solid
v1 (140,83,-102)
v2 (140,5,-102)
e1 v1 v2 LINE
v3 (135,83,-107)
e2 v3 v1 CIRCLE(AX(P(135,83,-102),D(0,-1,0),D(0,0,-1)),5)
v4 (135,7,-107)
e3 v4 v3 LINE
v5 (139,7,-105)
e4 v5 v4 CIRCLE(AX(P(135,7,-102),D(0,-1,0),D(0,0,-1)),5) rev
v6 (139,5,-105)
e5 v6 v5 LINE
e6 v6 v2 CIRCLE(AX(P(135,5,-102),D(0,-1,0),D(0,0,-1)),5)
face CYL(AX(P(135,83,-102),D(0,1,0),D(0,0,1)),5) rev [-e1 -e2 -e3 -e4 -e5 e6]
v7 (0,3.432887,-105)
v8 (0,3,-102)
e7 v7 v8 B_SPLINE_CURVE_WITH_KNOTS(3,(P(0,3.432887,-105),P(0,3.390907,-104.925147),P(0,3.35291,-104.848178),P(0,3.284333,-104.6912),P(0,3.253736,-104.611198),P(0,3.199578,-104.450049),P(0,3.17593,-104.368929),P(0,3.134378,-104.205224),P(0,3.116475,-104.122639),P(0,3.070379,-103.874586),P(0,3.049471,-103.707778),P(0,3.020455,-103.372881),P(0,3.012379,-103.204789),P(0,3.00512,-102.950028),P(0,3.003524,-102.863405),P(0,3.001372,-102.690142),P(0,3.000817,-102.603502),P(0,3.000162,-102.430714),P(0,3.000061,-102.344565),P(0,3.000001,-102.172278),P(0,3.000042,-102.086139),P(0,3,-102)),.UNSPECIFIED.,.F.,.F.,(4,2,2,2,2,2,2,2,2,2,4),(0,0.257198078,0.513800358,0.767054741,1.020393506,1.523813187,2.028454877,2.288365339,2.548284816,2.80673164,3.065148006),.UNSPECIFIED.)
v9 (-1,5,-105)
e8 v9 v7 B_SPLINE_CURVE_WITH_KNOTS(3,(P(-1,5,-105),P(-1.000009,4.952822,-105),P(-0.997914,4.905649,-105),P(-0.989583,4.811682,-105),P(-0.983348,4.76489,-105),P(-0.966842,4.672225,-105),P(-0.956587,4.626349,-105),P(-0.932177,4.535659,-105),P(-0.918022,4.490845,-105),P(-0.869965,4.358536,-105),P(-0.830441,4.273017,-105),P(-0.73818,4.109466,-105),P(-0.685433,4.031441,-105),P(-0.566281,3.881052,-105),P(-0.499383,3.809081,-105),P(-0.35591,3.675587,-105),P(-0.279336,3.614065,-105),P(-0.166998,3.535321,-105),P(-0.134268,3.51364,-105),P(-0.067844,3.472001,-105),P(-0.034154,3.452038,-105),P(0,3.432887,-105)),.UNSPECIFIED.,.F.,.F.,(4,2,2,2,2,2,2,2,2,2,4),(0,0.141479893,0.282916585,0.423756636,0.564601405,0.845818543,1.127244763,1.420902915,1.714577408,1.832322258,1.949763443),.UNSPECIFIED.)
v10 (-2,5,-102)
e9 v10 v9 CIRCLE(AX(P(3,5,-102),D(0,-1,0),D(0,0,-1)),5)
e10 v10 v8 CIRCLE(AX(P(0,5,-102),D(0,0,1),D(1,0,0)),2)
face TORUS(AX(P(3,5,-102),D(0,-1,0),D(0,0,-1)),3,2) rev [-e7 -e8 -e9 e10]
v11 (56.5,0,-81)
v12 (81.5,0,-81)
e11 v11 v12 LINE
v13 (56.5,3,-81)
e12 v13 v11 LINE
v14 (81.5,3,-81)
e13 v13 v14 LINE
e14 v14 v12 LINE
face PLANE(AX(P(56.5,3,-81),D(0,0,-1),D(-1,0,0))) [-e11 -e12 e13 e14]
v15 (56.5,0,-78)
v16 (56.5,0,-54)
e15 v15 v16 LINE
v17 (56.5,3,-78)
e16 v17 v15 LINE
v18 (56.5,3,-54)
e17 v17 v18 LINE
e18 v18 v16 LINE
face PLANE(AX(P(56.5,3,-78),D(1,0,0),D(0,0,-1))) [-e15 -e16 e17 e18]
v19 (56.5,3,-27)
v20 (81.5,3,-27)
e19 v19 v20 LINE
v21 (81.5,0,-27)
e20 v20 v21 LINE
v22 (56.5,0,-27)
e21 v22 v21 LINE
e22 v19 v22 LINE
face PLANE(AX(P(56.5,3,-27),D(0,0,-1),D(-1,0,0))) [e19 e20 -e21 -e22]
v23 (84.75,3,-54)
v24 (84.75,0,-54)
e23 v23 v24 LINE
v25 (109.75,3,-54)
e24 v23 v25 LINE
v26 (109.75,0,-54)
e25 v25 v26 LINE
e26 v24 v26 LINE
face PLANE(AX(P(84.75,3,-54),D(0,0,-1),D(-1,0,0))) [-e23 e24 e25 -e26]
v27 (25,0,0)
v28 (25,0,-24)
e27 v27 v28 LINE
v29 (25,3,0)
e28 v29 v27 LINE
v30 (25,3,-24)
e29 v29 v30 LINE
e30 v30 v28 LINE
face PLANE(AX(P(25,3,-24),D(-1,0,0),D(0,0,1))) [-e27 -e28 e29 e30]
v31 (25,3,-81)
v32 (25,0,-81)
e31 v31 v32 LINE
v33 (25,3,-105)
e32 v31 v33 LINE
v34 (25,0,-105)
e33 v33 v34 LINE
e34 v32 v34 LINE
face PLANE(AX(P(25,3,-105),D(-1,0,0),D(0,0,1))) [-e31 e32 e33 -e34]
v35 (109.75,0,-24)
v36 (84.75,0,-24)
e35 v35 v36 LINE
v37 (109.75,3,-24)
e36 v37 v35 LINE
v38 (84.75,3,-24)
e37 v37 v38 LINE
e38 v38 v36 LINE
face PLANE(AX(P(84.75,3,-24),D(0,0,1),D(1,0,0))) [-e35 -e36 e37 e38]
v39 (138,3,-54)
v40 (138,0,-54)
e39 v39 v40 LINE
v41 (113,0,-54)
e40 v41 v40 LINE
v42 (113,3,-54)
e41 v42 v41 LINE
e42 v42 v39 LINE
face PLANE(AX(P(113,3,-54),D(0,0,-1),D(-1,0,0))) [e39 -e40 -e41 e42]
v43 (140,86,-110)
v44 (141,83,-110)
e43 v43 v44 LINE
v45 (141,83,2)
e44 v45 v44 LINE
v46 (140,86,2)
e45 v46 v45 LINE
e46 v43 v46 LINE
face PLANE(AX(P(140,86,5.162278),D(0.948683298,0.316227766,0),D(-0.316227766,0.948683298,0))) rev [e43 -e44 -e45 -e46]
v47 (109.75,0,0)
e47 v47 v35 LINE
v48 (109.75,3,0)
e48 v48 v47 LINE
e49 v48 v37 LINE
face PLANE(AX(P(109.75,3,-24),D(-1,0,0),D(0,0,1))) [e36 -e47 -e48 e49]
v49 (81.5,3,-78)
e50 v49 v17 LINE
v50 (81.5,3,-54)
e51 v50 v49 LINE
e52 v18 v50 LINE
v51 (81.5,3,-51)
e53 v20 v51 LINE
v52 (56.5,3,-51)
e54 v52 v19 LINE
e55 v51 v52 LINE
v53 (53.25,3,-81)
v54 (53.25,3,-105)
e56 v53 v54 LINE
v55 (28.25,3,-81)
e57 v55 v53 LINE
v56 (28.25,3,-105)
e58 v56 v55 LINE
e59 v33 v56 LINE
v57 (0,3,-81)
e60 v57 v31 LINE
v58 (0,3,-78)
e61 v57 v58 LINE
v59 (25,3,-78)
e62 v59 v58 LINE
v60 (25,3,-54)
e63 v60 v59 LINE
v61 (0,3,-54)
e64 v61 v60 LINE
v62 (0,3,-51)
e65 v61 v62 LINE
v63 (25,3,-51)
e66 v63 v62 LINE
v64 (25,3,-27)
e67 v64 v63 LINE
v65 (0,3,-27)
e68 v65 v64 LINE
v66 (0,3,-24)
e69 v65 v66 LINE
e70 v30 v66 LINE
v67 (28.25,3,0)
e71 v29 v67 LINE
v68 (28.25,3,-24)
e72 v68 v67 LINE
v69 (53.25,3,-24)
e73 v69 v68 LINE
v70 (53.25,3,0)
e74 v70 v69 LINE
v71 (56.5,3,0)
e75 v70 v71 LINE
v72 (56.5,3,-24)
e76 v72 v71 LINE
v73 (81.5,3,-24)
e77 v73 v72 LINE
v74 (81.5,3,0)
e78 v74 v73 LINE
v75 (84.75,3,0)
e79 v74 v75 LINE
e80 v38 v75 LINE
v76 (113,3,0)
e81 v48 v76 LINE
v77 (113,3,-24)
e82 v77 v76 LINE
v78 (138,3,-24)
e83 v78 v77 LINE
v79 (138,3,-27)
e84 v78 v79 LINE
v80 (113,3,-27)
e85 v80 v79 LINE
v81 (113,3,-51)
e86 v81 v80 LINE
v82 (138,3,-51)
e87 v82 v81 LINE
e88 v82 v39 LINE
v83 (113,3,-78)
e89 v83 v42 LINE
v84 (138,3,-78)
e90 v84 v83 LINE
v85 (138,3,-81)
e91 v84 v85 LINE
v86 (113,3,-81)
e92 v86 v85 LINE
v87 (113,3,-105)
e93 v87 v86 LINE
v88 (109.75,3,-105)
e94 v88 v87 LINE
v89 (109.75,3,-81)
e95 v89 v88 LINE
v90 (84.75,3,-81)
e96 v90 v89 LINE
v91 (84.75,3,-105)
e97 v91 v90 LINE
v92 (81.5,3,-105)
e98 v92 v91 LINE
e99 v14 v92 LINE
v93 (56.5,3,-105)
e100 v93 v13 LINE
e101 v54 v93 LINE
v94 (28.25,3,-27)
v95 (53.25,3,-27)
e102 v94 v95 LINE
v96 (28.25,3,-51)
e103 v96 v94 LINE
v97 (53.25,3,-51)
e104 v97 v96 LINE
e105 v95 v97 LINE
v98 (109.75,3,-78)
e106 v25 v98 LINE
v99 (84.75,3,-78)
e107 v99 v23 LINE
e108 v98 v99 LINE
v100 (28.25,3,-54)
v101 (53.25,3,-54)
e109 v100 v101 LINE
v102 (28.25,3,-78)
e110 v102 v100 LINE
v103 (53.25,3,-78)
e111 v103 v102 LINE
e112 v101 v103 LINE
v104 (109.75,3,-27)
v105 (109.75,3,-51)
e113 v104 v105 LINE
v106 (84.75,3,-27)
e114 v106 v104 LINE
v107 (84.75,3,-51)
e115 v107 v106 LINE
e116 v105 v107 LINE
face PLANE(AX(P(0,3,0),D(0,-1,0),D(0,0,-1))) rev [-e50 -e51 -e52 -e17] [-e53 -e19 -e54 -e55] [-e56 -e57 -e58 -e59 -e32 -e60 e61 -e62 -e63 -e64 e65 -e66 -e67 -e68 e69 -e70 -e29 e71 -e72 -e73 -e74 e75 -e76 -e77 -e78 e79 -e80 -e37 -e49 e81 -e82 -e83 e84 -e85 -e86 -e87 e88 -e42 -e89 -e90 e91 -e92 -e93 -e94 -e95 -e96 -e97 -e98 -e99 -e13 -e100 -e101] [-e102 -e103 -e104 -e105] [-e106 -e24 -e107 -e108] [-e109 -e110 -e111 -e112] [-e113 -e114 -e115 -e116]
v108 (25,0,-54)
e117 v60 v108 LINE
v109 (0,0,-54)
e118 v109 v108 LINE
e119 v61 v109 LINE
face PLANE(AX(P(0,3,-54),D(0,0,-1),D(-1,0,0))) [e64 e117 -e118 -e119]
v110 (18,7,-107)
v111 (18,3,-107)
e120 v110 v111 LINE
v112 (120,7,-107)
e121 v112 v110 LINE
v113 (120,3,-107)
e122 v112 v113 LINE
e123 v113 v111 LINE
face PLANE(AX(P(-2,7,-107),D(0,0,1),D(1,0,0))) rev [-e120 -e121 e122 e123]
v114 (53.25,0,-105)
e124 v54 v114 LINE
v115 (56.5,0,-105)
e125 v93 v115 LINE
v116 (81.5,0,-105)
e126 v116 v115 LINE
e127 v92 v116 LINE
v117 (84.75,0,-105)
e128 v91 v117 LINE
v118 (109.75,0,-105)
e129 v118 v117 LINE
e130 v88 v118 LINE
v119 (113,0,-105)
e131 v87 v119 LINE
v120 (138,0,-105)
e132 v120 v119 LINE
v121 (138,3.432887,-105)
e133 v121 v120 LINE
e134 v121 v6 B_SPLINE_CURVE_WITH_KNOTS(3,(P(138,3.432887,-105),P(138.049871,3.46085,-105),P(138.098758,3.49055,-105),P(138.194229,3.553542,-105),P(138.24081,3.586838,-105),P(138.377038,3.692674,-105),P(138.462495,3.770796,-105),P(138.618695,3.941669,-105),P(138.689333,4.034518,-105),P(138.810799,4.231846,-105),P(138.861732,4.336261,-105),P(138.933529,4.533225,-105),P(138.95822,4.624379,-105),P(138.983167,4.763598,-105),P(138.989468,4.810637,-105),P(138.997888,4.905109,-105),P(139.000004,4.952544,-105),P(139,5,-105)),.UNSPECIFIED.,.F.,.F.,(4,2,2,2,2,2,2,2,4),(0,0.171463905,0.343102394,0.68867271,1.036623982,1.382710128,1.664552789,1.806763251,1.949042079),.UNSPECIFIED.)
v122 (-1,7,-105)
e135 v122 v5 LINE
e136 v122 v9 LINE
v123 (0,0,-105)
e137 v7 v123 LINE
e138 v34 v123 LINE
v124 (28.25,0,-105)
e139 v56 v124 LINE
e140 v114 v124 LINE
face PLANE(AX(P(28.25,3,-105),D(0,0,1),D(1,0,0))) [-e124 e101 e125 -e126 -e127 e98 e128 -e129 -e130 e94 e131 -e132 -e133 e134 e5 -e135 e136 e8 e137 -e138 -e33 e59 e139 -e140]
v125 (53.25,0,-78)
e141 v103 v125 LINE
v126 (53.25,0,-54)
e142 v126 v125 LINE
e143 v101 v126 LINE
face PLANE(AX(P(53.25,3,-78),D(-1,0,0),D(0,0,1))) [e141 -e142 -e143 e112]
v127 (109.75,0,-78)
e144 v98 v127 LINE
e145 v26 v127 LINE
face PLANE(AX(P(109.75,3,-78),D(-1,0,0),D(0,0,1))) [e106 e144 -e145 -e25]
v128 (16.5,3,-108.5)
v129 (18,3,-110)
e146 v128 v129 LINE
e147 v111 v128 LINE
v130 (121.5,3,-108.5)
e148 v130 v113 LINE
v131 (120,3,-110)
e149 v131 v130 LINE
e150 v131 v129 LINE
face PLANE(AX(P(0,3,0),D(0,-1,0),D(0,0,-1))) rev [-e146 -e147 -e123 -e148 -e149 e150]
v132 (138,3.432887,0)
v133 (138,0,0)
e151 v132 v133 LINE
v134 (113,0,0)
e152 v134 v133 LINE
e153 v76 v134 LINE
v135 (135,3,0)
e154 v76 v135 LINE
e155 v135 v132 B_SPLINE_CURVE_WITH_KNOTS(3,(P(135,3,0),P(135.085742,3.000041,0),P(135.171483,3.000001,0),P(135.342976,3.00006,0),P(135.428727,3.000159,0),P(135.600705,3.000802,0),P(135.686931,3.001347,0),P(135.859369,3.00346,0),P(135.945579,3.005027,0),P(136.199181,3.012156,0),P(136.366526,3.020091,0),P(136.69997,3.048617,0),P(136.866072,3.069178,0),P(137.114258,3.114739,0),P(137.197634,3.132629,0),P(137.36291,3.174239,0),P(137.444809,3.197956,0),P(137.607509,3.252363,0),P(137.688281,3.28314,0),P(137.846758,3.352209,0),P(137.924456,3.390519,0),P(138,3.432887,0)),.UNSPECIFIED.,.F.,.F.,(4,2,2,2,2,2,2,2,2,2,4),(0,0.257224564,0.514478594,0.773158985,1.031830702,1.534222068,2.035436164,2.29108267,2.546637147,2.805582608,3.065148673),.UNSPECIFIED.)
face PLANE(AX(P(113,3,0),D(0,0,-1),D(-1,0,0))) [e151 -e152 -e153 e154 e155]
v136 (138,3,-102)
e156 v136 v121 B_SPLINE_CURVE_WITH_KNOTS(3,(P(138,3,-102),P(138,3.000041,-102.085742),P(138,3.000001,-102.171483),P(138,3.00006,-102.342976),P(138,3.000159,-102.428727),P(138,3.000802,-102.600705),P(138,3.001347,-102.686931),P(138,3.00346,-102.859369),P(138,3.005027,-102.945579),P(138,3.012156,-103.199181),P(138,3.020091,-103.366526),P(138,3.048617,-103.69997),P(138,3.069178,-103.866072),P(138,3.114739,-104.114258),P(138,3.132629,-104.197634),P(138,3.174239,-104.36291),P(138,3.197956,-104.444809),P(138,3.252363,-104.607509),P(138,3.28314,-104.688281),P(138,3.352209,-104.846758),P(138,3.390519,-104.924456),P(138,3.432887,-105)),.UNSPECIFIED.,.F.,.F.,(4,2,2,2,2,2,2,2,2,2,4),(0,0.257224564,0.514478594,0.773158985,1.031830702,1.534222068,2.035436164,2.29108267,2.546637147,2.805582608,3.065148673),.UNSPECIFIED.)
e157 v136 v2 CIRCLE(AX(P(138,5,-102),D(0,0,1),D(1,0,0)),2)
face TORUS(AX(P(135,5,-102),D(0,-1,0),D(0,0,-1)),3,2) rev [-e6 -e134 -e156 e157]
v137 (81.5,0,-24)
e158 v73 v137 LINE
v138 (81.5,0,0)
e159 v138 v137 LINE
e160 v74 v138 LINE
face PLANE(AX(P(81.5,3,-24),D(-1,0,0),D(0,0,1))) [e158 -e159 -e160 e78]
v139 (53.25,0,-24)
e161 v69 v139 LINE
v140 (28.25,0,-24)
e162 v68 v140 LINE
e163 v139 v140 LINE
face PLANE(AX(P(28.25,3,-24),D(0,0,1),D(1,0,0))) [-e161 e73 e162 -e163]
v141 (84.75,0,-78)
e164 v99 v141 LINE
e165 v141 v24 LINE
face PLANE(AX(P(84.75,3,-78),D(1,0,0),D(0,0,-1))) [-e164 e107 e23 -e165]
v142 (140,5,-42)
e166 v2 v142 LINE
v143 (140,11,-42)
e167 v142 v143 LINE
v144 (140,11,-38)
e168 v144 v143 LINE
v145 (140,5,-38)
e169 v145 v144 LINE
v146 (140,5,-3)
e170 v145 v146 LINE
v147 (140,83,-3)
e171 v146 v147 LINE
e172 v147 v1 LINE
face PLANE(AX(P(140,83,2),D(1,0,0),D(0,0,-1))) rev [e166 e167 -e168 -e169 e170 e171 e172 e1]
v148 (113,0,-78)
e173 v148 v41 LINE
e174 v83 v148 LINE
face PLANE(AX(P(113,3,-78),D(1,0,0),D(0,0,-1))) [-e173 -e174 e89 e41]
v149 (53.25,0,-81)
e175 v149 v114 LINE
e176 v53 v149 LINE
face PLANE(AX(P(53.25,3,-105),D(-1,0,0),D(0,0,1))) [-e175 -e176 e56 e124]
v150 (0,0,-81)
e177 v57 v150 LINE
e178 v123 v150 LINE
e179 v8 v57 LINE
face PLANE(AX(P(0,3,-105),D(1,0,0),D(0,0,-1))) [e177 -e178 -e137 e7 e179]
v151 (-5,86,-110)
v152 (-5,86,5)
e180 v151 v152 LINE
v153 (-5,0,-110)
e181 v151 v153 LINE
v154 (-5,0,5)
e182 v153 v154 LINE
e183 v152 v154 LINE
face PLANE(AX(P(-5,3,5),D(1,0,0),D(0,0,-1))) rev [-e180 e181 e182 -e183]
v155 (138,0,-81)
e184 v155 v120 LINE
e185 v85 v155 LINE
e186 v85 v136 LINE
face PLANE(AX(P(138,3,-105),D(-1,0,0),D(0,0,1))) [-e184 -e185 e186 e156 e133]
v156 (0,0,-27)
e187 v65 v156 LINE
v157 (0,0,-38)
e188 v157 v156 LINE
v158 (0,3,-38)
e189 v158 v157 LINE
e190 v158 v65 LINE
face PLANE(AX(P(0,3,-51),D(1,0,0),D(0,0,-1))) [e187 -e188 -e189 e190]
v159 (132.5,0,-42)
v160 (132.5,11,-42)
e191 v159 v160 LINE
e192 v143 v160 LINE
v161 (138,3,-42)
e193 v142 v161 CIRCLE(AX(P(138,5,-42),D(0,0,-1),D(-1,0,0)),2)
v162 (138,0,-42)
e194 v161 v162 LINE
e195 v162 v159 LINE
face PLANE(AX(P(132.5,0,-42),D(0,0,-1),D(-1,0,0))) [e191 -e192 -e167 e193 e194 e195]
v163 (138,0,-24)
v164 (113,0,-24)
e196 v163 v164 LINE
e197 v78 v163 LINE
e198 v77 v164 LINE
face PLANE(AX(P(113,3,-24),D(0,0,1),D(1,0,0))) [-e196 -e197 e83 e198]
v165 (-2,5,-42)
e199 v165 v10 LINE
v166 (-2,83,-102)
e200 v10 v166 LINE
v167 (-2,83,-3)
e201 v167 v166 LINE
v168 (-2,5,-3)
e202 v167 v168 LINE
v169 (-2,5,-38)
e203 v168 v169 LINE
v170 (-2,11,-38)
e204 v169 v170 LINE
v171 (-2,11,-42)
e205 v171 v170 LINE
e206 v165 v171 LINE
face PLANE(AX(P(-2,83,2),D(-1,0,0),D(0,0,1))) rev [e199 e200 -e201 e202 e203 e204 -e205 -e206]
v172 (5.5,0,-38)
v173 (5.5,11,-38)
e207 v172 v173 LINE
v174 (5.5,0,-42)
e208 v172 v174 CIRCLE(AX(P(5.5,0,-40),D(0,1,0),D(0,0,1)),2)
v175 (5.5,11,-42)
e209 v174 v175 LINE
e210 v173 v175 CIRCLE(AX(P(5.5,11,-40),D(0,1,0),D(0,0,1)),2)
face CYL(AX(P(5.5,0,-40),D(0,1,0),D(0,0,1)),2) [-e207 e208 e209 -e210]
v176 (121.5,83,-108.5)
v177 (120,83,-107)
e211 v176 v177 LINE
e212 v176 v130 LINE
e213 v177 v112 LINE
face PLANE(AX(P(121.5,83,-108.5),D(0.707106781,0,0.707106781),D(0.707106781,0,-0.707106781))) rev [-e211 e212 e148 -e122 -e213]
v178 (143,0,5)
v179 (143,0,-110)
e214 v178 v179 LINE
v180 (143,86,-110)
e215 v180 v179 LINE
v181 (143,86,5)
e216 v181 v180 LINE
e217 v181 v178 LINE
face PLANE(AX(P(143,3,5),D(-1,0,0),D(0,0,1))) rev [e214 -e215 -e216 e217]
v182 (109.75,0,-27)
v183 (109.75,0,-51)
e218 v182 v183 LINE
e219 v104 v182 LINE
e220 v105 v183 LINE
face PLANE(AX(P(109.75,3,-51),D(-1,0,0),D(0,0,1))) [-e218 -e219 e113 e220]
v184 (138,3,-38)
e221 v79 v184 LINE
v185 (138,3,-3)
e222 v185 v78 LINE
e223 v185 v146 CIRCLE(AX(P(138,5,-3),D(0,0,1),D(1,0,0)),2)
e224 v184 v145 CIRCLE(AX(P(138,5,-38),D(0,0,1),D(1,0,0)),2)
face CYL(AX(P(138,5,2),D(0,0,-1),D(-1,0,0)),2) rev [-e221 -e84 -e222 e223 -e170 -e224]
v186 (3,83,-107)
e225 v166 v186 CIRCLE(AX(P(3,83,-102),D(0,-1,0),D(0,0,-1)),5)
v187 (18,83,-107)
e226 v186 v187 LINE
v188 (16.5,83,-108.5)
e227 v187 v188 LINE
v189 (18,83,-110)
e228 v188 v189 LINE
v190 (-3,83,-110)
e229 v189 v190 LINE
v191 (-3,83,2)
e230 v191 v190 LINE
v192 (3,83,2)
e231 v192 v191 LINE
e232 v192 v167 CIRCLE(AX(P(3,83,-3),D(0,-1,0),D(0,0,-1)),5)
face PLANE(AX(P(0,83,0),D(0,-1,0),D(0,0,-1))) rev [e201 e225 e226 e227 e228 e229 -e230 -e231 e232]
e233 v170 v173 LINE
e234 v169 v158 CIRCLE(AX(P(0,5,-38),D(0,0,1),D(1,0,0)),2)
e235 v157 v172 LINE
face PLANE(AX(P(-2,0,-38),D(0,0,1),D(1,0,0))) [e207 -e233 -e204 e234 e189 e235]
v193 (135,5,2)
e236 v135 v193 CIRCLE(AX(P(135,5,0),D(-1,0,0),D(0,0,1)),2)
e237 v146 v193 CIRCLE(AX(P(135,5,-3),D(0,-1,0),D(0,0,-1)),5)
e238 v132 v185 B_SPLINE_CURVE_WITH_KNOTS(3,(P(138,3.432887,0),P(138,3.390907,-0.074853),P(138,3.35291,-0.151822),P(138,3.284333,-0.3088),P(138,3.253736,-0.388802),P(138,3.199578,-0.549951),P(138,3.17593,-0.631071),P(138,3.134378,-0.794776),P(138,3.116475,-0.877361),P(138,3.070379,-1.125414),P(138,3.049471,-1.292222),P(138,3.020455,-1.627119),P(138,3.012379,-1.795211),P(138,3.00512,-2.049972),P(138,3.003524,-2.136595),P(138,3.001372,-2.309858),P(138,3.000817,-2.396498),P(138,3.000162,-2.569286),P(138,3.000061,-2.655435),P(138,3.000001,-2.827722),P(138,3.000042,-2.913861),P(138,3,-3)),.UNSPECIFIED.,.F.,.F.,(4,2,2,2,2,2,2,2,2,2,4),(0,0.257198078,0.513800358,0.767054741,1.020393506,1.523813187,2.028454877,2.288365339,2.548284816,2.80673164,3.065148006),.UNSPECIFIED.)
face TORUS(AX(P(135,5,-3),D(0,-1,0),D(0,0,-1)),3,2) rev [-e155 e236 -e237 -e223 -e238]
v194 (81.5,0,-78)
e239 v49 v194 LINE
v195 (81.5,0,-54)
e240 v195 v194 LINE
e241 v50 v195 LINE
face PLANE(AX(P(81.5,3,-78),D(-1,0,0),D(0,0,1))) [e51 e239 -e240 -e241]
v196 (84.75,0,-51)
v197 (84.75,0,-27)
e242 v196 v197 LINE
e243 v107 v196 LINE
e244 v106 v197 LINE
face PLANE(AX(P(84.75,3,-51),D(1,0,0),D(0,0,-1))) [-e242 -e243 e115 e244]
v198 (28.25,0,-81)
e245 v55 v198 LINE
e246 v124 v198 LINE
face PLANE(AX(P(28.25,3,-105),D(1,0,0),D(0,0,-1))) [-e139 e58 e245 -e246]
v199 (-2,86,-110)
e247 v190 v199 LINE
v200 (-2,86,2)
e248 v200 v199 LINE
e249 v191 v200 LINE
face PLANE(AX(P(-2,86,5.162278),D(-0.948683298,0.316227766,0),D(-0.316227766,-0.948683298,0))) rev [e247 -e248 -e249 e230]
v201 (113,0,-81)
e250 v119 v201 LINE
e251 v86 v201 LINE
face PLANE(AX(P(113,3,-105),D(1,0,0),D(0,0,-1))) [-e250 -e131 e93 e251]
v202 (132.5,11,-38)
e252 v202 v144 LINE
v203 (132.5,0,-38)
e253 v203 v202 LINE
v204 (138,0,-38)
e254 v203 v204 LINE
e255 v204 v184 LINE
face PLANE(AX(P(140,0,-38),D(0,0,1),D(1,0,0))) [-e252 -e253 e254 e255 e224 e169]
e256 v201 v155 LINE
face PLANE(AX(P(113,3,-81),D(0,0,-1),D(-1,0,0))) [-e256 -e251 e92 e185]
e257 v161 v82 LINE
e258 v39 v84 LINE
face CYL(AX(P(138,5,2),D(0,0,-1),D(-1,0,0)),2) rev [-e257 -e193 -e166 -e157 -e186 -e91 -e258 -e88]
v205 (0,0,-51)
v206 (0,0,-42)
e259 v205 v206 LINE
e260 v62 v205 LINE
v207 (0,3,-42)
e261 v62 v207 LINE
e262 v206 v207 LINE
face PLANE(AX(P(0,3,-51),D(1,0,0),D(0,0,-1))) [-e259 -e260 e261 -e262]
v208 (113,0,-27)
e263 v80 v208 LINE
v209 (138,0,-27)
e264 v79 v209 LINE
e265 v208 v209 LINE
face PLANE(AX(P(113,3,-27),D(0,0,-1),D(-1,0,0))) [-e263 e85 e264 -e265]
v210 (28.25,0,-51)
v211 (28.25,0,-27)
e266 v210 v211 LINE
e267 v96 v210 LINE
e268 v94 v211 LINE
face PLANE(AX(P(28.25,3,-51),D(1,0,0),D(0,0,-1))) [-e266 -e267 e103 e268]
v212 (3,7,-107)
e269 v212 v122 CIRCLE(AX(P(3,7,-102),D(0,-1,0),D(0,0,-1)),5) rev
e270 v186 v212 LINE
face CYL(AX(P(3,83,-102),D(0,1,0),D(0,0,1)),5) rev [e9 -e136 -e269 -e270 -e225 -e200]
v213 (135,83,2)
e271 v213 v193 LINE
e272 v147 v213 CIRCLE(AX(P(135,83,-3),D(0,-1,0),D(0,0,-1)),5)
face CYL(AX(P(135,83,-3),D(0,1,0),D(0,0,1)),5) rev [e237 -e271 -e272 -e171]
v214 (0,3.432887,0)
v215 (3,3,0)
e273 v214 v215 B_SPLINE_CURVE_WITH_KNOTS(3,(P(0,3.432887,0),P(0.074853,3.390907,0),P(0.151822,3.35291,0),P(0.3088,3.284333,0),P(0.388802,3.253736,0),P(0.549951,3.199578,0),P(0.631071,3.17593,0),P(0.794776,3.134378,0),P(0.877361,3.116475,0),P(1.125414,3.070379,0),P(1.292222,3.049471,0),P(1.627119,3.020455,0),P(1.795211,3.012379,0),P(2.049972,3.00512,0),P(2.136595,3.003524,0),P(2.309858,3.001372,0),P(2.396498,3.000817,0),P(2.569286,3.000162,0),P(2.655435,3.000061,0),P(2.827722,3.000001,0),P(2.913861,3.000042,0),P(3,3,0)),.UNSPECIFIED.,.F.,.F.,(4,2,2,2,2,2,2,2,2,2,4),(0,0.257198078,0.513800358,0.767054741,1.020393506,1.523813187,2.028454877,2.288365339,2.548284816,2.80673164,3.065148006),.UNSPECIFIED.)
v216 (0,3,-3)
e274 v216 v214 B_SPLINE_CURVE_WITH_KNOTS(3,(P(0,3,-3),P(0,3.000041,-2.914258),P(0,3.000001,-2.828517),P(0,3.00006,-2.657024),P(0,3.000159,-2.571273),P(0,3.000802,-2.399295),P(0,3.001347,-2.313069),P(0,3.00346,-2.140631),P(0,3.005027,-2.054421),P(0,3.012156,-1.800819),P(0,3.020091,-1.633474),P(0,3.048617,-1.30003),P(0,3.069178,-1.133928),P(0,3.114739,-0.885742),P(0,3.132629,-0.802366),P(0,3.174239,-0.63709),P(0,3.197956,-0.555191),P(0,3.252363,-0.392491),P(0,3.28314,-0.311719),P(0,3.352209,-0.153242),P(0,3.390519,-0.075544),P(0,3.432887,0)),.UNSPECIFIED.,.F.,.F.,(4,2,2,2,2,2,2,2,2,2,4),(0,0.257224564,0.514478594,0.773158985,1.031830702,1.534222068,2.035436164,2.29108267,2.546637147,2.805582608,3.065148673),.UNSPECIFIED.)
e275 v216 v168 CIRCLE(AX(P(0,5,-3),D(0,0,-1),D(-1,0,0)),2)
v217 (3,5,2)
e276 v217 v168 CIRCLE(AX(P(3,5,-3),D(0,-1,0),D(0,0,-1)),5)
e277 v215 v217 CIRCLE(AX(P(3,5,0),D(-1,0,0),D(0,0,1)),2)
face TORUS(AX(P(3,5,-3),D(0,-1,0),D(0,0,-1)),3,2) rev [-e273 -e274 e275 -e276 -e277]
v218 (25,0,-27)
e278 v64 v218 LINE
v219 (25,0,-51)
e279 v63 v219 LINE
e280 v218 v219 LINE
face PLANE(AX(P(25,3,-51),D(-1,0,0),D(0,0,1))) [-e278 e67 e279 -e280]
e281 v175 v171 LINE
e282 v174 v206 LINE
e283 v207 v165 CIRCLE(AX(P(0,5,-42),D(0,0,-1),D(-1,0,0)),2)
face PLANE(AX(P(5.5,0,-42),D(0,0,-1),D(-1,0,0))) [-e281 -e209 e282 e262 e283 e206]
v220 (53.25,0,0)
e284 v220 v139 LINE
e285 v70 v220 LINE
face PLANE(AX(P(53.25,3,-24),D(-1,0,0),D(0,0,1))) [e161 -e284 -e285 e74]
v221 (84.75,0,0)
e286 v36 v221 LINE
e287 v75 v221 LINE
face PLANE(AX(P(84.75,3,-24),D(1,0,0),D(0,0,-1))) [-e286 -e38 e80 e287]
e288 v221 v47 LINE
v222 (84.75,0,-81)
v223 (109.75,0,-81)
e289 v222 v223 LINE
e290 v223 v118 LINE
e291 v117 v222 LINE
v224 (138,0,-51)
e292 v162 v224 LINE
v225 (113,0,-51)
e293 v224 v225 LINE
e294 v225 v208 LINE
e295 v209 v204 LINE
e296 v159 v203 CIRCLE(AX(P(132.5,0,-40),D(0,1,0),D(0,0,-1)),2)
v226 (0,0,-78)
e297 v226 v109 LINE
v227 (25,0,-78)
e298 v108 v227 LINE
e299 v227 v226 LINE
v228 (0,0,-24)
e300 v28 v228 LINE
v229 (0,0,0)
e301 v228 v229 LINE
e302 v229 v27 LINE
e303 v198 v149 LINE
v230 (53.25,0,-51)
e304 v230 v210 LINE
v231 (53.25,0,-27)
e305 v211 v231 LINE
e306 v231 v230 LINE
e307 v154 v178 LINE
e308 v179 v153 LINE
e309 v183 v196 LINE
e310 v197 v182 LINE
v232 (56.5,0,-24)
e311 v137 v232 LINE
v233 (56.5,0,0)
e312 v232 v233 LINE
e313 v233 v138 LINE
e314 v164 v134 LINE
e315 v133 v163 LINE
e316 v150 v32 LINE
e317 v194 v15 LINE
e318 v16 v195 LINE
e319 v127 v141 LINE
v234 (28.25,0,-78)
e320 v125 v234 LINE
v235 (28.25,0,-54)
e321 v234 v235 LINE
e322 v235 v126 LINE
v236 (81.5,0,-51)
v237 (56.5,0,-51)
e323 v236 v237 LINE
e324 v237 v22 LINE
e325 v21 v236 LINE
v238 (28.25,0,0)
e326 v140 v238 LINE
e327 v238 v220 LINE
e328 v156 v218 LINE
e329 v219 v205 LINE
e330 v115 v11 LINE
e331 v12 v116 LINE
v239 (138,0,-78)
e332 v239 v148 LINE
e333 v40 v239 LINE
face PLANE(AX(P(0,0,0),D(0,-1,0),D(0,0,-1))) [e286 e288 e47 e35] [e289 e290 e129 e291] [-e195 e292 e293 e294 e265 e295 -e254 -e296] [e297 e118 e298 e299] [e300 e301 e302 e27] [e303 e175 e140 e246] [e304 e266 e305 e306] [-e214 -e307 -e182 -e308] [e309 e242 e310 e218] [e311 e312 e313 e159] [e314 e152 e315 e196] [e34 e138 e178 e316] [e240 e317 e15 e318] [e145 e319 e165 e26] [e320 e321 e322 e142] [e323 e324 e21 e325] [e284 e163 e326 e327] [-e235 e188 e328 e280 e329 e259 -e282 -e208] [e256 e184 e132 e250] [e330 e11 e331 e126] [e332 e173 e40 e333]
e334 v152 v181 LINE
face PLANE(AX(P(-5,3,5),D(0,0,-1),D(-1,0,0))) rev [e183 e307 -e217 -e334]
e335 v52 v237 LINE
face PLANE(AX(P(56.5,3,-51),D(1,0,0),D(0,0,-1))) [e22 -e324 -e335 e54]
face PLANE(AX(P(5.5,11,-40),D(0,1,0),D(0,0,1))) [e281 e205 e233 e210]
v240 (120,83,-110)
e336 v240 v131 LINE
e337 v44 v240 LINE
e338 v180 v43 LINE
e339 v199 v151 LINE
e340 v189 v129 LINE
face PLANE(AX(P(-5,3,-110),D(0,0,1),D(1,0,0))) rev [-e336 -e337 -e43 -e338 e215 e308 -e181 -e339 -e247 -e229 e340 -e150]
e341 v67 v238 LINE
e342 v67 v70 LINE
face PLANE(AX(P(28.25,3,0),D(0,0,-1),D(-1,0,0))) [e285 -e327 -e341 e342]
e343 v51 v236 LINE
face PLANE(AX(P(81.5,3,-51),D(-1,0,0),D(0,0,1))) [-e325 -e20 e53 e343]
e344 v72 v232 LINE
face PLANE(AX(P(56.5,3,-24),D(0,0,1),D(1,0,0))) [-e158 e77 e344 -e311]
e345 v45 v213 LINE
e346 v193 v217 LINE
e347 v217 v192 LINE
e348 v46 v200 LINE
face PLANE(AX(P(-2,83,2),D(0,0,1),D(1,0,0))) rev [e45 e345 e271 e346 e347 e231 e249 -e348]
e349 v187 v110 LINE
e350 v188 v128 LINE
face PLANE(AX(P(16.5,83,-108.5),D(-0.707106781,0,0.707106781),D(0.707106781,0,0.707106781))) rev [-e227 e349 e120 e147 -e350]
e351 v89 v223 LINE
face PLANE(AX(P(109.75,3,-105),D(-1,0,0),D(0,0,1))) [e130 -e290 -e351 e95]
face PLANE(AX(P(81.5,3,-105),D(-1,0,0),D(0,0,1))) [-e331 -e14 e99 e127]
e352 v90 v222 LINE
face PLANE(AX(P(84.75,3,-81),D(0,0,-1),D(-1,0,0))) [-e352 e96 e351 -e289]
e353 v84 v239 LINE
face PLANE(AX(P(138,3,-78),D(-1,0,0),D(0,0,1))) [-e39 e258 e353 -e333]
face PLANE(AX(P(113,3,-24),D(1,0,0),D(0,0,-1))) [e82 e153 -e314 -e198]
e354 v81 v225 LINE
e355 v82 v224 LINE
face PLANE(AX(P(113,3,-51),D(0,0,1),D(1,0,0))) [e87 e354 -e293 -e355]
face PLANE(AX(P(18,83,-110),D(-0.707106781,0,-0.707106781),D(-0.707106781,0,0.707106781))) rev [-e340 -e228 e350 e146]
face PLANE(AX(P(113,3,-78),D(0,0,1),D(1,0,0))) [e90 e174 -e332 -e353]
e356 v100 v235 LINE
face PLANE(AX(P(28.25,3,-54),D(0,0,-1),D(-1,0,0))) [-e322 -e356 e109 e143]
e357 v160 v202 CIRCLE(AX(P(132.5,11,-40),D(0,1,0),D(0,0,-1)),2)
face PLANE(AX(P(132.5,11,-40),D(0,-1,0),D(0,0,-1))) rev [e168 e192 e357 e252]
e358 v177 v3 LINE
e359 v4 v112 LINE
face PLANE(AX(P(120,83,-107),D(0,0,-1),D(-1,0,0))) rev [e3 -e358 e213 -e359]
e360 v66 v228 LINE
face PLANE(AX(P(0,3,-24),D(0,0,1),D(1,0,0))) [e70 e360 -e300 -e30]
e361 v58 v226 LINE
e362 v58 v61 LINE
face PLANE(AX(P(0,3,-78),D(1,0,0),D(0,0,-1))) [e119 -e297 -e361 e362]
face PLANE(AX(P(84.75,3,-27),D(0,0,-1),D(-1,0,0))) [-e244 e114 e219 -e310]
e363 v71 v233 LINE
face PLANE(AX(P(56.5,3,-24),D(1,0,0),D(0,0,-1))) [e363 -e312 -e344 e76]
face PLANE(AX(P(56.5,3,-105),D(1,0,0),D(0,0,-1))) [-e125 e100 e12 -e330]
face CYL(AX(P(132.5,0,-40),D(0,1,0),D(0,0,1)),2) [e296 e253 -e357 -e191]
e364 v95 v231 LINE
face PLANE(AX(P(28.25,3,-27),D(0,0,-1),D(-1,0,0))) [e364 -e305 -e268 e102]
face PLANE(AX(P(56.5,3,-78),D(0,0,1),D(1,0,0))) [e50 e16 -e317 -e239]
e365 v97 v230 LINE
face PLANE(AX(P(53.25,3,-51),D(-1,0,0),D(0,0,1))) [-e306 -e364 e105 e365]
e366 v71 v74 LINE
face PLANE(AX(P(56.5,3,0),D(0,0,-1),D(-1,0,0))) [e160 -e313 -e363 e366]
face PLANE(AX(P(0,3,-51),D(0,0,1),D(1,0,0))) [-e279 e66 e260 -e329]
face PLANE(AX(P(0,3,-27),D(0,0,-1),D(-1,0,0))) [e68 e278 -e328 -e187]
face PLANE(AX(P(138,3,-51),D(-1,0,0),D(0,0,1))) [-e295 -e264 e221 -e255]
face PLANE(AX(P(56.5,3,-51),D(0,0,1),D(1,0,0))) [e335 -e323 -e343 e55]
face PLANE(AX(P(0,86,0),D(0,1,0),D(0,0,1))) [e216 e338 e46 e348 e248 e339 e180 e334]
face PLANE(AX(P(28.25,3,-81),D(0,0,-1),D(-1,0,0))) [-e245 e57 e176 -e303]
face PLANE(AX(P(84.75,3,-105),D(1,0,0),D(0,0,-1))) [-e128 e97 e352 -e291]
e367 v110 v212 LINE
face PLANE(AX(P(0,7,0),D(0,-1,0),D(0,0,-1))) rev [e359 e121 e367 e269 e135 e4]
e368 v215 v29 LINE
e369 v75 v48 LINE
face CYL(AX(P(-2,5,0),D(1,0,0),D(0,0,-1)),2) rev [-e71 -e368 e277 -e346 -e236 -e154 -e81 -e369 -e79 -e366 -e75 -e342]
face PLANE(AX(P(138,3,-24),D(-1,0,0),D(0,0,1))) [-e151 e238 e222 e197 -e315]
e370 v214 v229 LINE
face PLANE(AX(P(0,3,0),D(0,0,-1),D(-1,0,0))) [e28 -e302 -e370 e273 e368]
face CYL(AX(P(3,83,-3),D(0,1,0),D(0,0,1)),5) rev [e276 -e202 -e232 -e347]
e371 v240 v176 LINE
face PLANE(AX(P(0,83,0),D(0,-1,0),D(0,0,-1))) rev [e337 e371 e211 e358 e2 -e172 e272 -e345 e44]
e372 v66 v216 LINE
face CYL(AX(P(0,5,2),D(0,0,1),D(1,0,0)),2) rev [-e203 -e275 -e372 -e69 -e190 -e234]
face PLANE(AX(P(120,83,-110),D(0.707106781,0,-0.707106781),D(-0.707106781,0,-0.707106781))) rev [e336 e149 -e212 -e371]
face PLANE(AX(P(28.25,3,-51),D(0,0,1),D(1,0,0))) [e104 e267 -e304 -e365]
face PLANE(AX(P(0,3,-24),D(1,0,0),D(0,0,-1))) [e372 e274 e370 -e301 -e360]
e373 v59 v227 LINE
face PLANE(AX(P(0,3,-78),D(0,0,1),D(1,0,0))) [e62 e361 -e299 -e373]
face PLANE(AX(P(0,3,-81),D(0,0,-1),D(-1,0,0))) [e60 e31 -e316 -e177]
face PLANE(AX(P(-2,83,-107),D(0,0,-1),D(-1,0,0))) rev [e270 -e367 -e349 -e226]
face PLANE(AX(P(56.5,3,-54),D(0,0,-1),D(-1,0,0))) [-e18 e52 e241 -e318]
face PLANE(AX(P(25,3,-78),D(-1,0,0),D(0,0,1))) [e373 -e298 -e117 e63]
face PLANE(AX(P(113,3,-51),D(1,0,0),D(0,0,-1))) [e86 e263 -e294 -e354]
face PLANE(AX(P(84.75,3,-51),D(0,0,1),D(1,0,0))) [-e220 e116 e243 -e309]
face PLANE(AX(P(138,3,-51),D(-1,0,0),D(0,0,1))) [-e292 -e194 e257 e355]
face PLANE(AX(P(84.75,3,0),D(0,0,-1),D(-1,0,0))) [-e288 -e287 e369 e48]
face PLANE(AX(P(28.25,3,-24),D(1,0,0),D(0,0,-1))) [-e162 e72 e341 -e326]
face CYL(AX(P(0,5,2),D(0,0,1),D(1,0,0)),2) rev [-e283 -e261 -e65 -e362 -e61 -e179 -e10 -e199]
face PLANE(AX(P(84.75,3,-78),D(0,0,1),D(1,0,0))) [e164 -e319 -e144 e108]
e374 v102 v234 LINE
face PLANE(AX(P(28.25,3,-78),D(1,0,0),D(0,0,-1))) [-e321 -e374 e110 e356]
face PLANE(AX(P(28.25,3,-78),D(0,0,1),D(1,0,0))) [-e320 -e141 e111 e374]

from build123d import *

# Parameters (mm, degrees)
SKETCH1_W                = 148
SKETCH1_H                = 115
SKETCH1_W_2              = 25
SKETCH1_H_2              = 24
BOSS_EXTRUDE2_DEPTH      = 3
BOSS_EXTRUDE3_DEPTH      = 80
SKETCH21_W               = 142
SKETCH21_H               = 2
BOSS_EXTRUDE9_DEPTH      = 4
BOSS_EXTRUDE7_DEPTH      = 8
BOSS_EXTRUDE7_DEPTH_BACK = 3
BOSS_EXTRUDE8_DEPTH      = 3
CUT_EXTRUDE1_DEPTH       = 112
FILLET1_R                = 5
FILLET2_R                = 2


with BuildPart() as part:
    # Sketch1 → Boss-Extrude2 (new body)
    with BuildSketch(Plane(origin=(0, 0, 0), x_dir=(1, 0, 0), z_dir=(0, 1, 0))):
        with Locations((69, 52.5)):
            Rectangle(SKETCH1_W, SKETCH1_H)
        with Locations((12.5, 66)):
            Rectangle(SKETCH1_W_2, SKETCH1_H_2, mode=Mode.SUBTRACT)
        with Locations((12.5, 39)):
            Rectangle(SKETCH1_W_2, SKETCH1_H_2, mode=Mode.SUBTRACT)
        with Locations((40.75, 66)):
            Rectangle(SKETCH1_W_2, SKETCH1_H_2, mode=Mode.SUBTRACT)
        with Locations((40.75, 39)):
            Rectangle(SKETCH1_W_2, SKETCH1_H_2, mode=Mode.SUBTRACT)
        with Locations((12.5, 12)):
            Rectangle(SKETCH1_W_2, SKETCH1_H_2, mode=Mode.SUBTRACT)
        with Locations((12.5, 93)):
            Rectangle(SKETCH1_W_2, SKETCH1_H_2, mode=Mode.SUBTRACT)
        with Locations((40.75, 12)):
            Rectangle(SKETCH1_W_2, SKETCH1_H_2, mode=Mode.SUBTRACT)
        with Locations((40.75, 93)):
            Rectangle(SKETCH1_W_2, SKETCH1_H_2, mode=Mode.SUBTRACT)
        with Locations((69, 66)):
            Rectangle(SKETCH1_W_2, SKETCH1_H_2, mode=Mode.SUBTRACT)
        with Locations((69, 39)):
            Rectangle(SKETCH1_W_2, SKETCH1_H_2, mode=Mode.SUBTRACT)
        with Locations((69, 12)):
            Rectangle(SKETCH1_W_2, SKETCH1_H_2, mode=Mode.SUBTRACT)
        with Locations((69, 93)):
            Rectangle(SKETCH1_W_2, SKETCH1_H_2, mode=Mode.SUBTRACT)
        with Locations((97.25, 66)):
            Rectangle(SKETCH1_W_2, SKETCH1_H_2, mode=Mode.SUBTRACT)
        with Locations((97.25, 39)):
            Rectangle(SKETCH1_W_2, SKETCH1_H_2, mode=Mode.SUBTRACT)
        with Locations((97.25, 12)):
            Rectangle(SKETCH1_W_2, SKETCH1_H_2, mode=Mode.SUBTRACT)
        with Locations((97.25, 93)):
            Rectangle(SKETCH1_W_2, SKETCH1_H_2, mode=Mode.SUBTRACT)
        with Locations((125.5, 66)):
            Rectangle(SKETCH1_W_2, SKETCH1_H_2, mode=Mode.SUBTRACT)
        with Locations((125.5, 39)):
            Rectangle(SKETCH1_W_2, SKETCH1_H_2, mode=Mode.SUBTRACT)
        with Locations((125.5, 12)):
            Rectangle(SKETCH1_W_2, SKETCH1_H_2, mode=Mode.SUBTRACT)
        with Locations((125.5, 93)):
            Rectangle(SKETCH1_W_2, SKETCH1_H_2, mode=Mode.SUBTRACT)
    extrude(amount=BOSS_EXTRUDE2_DEPTH)

    # Sketch4 → Boss-Extrude3 (add)
    with BuildSketch(Plane(origin=(0, 3, 0), x_dir=(1, 0, 0), z_dir=(0, 1, 0))):
        Polygon((-5, -5), (143, -5), (143, 110), (120, 110), (121.5, 108.5), (120, 107), (140, 107), (140, -2), (-2, -2), (-2, 107), (18, 107), (16.5, 108.5), (18, 110), (-5, 110), align=None)
    extrude(amount=BOSS_EXTRUDE3_DEPTH)

    # Sketch21 → Boss-Extrude9 (add)
    with BuildSketch(Plane(origin=(0, 3, 0), x_dir=(1, 0, 0), z_dir=(0, 1, 0))):
        with Locations((69, 106)):
            Rectangle(SKETCH21_W, SKETCH21_H)
    extrude(amount=BOSS_EXTRUDE9_DEPTH)

    # Sketch16 → Boss-Extrude7 (add, two sides: drawn at the far end of the back side and taken through both)
    with BuildSketch(Plane(origin=(0, 3, 0), x_dir=(1, 0, 0), z_dir=(0, 1, 0)).offset(-BOSS_EXTRUDE7_DEPTH_BACK)):
        with BuildLine():
            Line((5.5, 42), (-2, 42))
            Line((-2, 42), (-2, 38))
            Line((-2, 38), (5.5, 38))
            ThreePointArc((5.5, 38), (7.5, 40), (5.5, 42))
        make_face()
        with BuildLine():
            Line((140, 38), (132.5, 38))
            ThreePointArc((132.5, 38), (130.5, 40), (132.5, 42))
            Line((132.5, 42), (140, 42))
            Line((140, 42), (140, 38))
        make_face()
    extrude(amount=BOSS_EXTRUDE7_DEPTH + BOSS_EXTRUDE7_DEPTH_BACK)

    # Sketch17 → Boss-Extrude8 (add)
    with BuildSketch(Plane(origin=(0, 83, 0), x_dir=(1, 0, 0), z_dir=(0, 1, 0))):
        Polygon((-2, 110), (-5, 110), (-5, -5), (143, -5), (143, 110), (140, 110), (140, -2), (-2, -2), align=None)
    extrude(amount=BOSS_EXTRUDE8_DEPTH)

    # Sketch18 → Cut-Extrude1 (cut)
    with BuildSketch(Plane(origin=(0, 0, -110), x_dir=(-1, 0, 0), z_dir=(0, 0, -1))):
        Polygon((2, 86), (3, 83), (2, 83), align=None)
        Polygon((-140, 83), (-140, 86), (-141, 83), align=None)
    extrude(amount=-CUT_EXTRUDE1_DEPTH, mode=Mode.SUBTRACT)

    # Fillet1
    # the kernel refuses this fillet: 5 mm, written as the material it adds along each edge
    with BuildSketch(Plane(origin=(140, -5.5, -107), x_dir=(-1, 0, 0), z_dir=(0, 1, 0))) as fillet1_piece_1_section:
        with BuildLine():
            CenterArc((FILLET1_R, FILLET1_R), FILLET1_R, 180, 90)
            Line((0, FILLET1_R), (0, 0))
            Line((0, 0), (FILLET1_R, 0))
        make_face()
    fillet1_piece_1 = extrude(amount=88.5, mode=Mode.PRIVATE)
    fillet1_piece_1 = split(fillet1_piece_1, bisect_by=Plane(origin=(139.705950561, 3, -104.265828048), z_dir=(0, 1, 0)), keep=Keep.TOP, mode=Mode.PRIVATE)
    add(fillet1_piece_1)
    with BuildSketch(Plane(origin=(-2, -5.5, -107), x_dir=(0, 0, 1), z_dir=(0, 1, 0))) as fillet1_piece_2_section:
        with BuildLine():
            CenterArc((FILLET1_R, FILLET1_R), FILLET1_R, 180, 90)
            Line((0, FILLET1_R), (0, 0))
            Line((0, 0), (FILLET1_R, 0))
        make_face()
    fillet1_piece_2 = extrude(amount=88.5, mode=Mode.PRIVATE)
    fillet1_piece_2 = split(fillet1_piece_2, bisect_by=Plane(origin=(-1.705950561, 3, -104.265828048), z_dir=(0, 1, 0)), keep=Keep.TOP, mode=Mode.PRIVATE)
    add(fillet1_piece_2)
    with BuildSketch(Plane(origin=(140, 3, 2), x_dir=(-1, 0, 0), z_dir=(0, 1, 0)), Plane(origin=(-2, 3, 2), x_dir=(0, 0, -1), z_dir=(0, 1, 0))) as fillet1_piece_3:
        with BuildLine():
            CenterArc((FILLET1_R, -FILLET1_R), FILLET1_R, 90, 90)
            Line((0, -FILLET1_R), (0, 0))
            Line((0, 0), (FILLET1_R, 0))
        make_face()
    extrude(amount=80)

    # Fillet2
    # the kernel refuses this fillet: 2 mm, written as the material it adds along each edge
    with BuildSketch(Plane(origin=(135, 3, -102), x_dir=(-0.07270796920191176, 0, -0.9973532730254281), z_dir=(-0.9973532730254281, 0, 0.07270796920191176))) as fillet2_piece_1_section:
        with BuildLine():
            CenterArc((5 - FILLET2_R, -FILLET2_R), FILLET2_R, 0, 90)
            Line((5 - FILLET2_R, 0), (5, 0))
            Line((5, 0), (5, -FILLET2_R))
        make_face()
    fillet2_piece_1 = revolve(axis=Axis((135, 3, -102), (0, -1, 0)), revolution_arc=94.169538965, mode=Mode.PRIVATE)
    fillet2_piece_1 = split(fillet2_piece_1, bisect_by=Plane(origin=(138, 3.470530123, -106.266382325), z_dir=(-1, 0, 0)), keep=Keep.TOP, mode=Mode.PRIVATE)
    fillet2_piece_1 = split(fillet2_piece_1, bisect_by=Plane(origin=(136.35715758, 3.470530123, -105), z_dir=(0, 0, -1)), keep=Keep.TOP, mode=Mode.PRIVATE)
    add(fillet2_piece_1)
    with BuildSketch(Plane(origin=(135, 3, -102), x_dir=(-0.07270796920191176, 0, -0.9973532730254281), z_dir=(-0.9973532730254281, 0, 0.07270796920191176))) as fillet2_piece_2_section:
        with BuildLine():
            CenterArc((5 - FILLET2_R, -FILLET2_R), FILLET2_R, 0, 90)
            Line((5 - FILLET2_R, 0), (5, 0))
            Line((5, 0), (5, -FILLET2_R))
        make_face()
    fillet2_piece_2 = revolve(axis=Axis((135, 3, -102), (0, -1, 0)), revolution_arc=94.169538965, mode=Mode.PRIVATE)
    fillet2_piece_2 = split(fillet2_piece_2, bisect_by=Plane(origin=(138, 3.649157182, -105.409619708), z_dir=(1, 0, 0)), keep=Keep.TOP, mode=Mode.PRIVATE)
    fillet2_piece_2 = split(fillet2_piece_2, bisect_by=Plane(origin=(138.409619683, 3.649157182, -105), z_dir=(0, 0, -1)), keep=Keep.TOP, mode=Mode.PRIVATE)
    add(fillet2_piece_2)
    with BuildSketch(Plane(origin=(135, 3, -102), x_dir=(-0.07270796920191176, 0, -0.9973532730254281), z_dir=(-0.9973532730254281, 0, 0.07270796920191176))) as fillet2_piece_3_section:
        with BuildLine():
            CenterArc((5 - FILLET2_R, -FILLET2_R), FILLET2_R, 0, 90)
            Line((5 - FILLET2_R, 0), (5, 0))
            Line((5, 0), (5, -FILLET2_R))
        make_face()
    fillet2_piece_3 = revolve(axis=Axis((135, 3, -102), (0, -1, 0)), revolution_arc=94.169538965, mode=Mode.PRIVATE)
    fillet2_piece_3 = split(fillet2_piece_3, bisect_by=Plane(origin=(138, 3.469844762, -103.519186596), z_dir=(1, 0, 0)), keep=Keep.TOP, mode=Mode.PRIVATE)
    fillet2_piece_3 = split(fillet2_piece_3, bisect_by=Plane(origin=(139.232598195, 3.469844762, -105), z_dir=(0, 0, 1)), keep=Keep.TOP, mode=Mode.PRIVATE)
    add(fillet2_piece_3)
    with BuildSketch(Plane(origin=(135, 3, -3), x_dir=(0, 0, 1), z_dir=(-1, 0, 0))) as fillet2_piece_4_section:
        with BuildLine():
            CenterArc((5 - FILLET2_R, FILLET2_R), FILLET2_R, 270, 90)
            Line((5 - FILLET2_R, 0), (5, 0))
            Line((5, 0), (5, FILLET2_R))
        make_face()
    fillet2_piece_4 = revolve(axis=Axis((135, 3, -3), (0, 1, 0)), revolution_arc=90, mode=Mode.PRIVATE)
    fillet2_piece_4 = split(fillet2_piece_4, bisect_by=Plane(origin=(136.519186645, 3.469844745, 0), z_dir=(0, 0, 1)), keep=Keep.TOP, mode=Mode.PRIVATE)
    fillet2_piece_4 = split(fillet2_piece_4, bisect_by=Plane(origin=(138, 3.469844745, 1.232598019), z_dir=(-1, 0, 0)), keep=Keep.TOP, mode=Mode.PRIVATE)
    add(fillet2_piece_4)
    with BuildSketch(Plane(origin=(135, 3, -3), x_dir=(0, 0, 1), z_dir=(-1, 0, 0))) as fillet2_piece_5_section:
        with BuildLine():
            CenterArc((5 - FILLET2_R, FILLET2_R), FILLET2_R, 270, 90)
            Line((5 - FILLET2_R, 0), (5, 0))
            Line((5, 0), (5, FILLET2_R))
        make_face()
    fillet2_piece_5 = revolve(axis=Axis((135, 3, -3), (0, 1, 0)), revolution_arc=90, mode=Mode.PRIVATE)
    fillet2_piece_5 = split(fillet2_piece_5, bisect_by=Plane(origin=(138.409619683, 3.649157182, 0), z_dir=(0, 0, 1)), keep=Keep.TOP, mode=Mode.PRIVATE)
    fillet2_piece_5 = split(fillet2_piece_5, bisect_by=Plane(origin=(138, 3.649157182, 0.409619708), z_dir=(1, 0, 0)), keep=Keep.TOP, mode=Mode.PRIVATE)
    add(fillet2_piece_5)
    with BuildSketch(Plane(origin=(135, 3, -3), x_dir=(0, 0, 1), z_dir=(-1, 0, 0))) as fillet2_piece_6_section:
        with BuildLine():
            CenterArc((5 - FILLET2_R, FILLET2_R), FILLET2_R, 270, 90)
            Line((5 - FILLET2_R, 0), (5, 0))
            Line((5, 0), (5, FILLET2_R))
        make_face()
    fillet2_piece_6 = revolve(axis=Axis((135, 3, -3), (0, 1, 0)), revolution_arc=90, mode=Mode.PRIVATE)
    fillet2_piece_6 = split(fillet2_piece_6, bisect_by=Plane(origin=(139.232598178, 3.469844758, 0), z_dir=(0, 0, -1)), keep=Keep.TOP, mode=Mode.PRIVATE)
    fillet2_piece_6 = split(fillet2_piece_6, bisect_by=Plane(origin=(138, 3.469844758, -1.480813405), z_dir=(1, 0, 0)), keep=Keep.TOP, mode=Mode.PRIVATE)
    add(fillet2_piece_6)
    with BuildSketch(Plane(origin=(3, 3, -3), x_dir=(-1, 0, 0), z_dir=(0, 0, -1))) as fillet2_piece_7_section:
        with BuildLine():
            CenterArc((5 - FILLET2_R, FILLET2_R), FILLET2_R, 270, 90)
            Line((5 - FILLET2_R, 0), (5, 0))
            Line((5, 0), (5, FILLET2_R))
        make_face()
    fillet2_piece_7 = revolve(axis=Axis((3, 3, -3), (0, 1, 0)), revolution_arc=90, mode=Mode.PRIVATE)
    fillet2_piece_7 = split(fillet2_piece_7, bisect_by=Plane(origin=(0, 3.469844745, -1.480813355), z_dir=(-1, 0, 0)), keep=Keep.TOP, mode=Mode.PRIVATE)
    fillet2_piece_7 = split(fillet2_piece_7, bisect_by=Plane(origin=(-1.232598019, 3.469844745, 0), z_dir=(0, 0, -1)), keep=Keep.TOP, mode=Mode.PRIVATE)
    add(fillet2_piece_7)
    with BuildSketch(Plane(origin=(3, 3, -3), x_dir=(-1, 0, 0), z_dir=(0, 0, -1))) as fillet2_piece_8_section:
        with BuildLine():
            CenterArc((5 - FILLET2_R, FILLET2_R), FILLET2_R, 270, 90)
            Line((5 - FILLET2_R, 0), (5, 0))
            Line((5, 0), (5, FILLET2_R))
        make_face()
    fillet2_piece_8 = revolve(axis=Axis((3, 3, -3), (0, 1, 0)), revolution_arc=90, mode=Mode.PRIVATE)
    fillet2_piece_8 = split(fillet2_piece_8, bisect_by=Plane(origin=(0, 3.649157182, 0.409619683), z_dir=(-1, 0, 0)), keep=Keep.TOP, mode=Mode.PRIVATE)
    fillet2_piece_8 = split(fillet2_piece_8, bisect_by=Plane(origin=(-0.409619708, 3.649157182, 0), z_dir=(0, 0, 1)), keep=Keep.TOP, mode=Mode.PRIVATE)
    add(fillet2_piece_8)
    with BuildSketch(Plane(origin=(3, 3, -3), x_dir=(-1, 0, 0), z_dir=(0, 0, -1))) as fillet2_piece_9_section:
        with BuildLine():
            CenterArc((5 - FILLET2_R, FILLET2_R), FILLET2_R, 270, 90)
            Line((5 - FILLET2_R, 0), (5, 0))
            Line((5, 0), (5, FILLET2_R))
        make_face()
    fillet2_piece_9 = revolve(axis=Axis((3, 3, -3), (0, 1, 0)), revolution_arc=90, mode=Mode.PRIVATE)
    fillet2_piece_9 = split(fillet2_piece_9, bisect_by=Plane(origin=(0, 3.469844758, 1.232598178), z_dir=(1, 0, 0)), keep=Keep.TOP, mode=Mode.PRIVATE)
    fillet2_piece_9 = split(fillet2_piece_9, bisect_by=Plane(origin=(1.480813405, 3.469844758, 0), z_dir=(0, 0, 1)), keep=Keep.TOP, mode=Mode.PRIVATE)
    add(fillet2_piece_9)
    with BuildSketch(Plane(origin=(3, 3, -102), x_dir=(-1, 0, 0), z_dir=(0, 0, 1))) as fillet2_piece_10_section:
        with BuildLine():
            CenterArc((5 - FILLET2_R, -FILLET2_R), FILLET2_R, 0, 90)
            Line((5 - FILLET2_R, 0), (5, 0))
            Line((5, 0), (5, -FILLET2_R))
        make_face()
    fillet2_piece_10 = revolve(axis=Axis((3, 3, -102), (0, -1, 0)), revolution_arc=94.169538965, mode=Mode.PRIVATE)
    fillet2_piece_10 = split(fillet2_piece_10, bisect_by=Plane(origin=(0, 3.469844744, -103.519186642), z_dir=(-1, 0, 0)), keep=Keep.TOP, mode=Mode.PRIVATE)
    fillet2_piece_10 = split(fillet2_piece_10, bisect_by=Plane(origin=(-1.232598016, 3.469844744, -105), z_dir=(0, 0, 1)), keep=Keep.TOP, mode=Mode.PRIVATE)
    add(fillet2_piece_10)
    with BuildSketch(Plane(origin=(3, 3, -102), x_dir=(-1, 0, 0), z_dir=(0, 0, 1))) as fillet2_piece_11_section:
        with BuildLine():
            CenterArc((5 - FILLET2_R, -FILLET2_R), FILLET2_R, 0, 90)
            Line((5 - FILLET2_R, 0), (5, 0))
            Line((5, 0), (5, -FILLET2_R))
        make_face()
    fillet2_piece_11 = revolve(axis=Axis((3, 3, -102), (0, -1, 0)), revolution_arc=94.169538965, mode=Mode.PRIVATE)
    fillet2_piece_11 = split(fillet2_piece_11, bisect_by=Plane(origin=(0, 3.649157182, -105.409619683), z_dir=(-1, 0, 0)), keep=Keep.TOP, mode=Mode.PRIVATE)
    fillet2_piece_11 = split(fillet2_piece_11, bisect_by=Plane(origin=(-0.409619708, 3.649157182, -105), z_dir=(0, 0, -1)), keep=Keep.TOP, mode=Mode.PRIVATE)
    add(fillet2_piece_11)
    with BuildSketch(Plane(origin=(3, 3, -102), x_dir=(-1, 0, 0), z_dir=(0, 0, 1))) as fillet2_piece_12_section:
        with BuildLine():
            CenterArc((5 - FILLET2_R, -FILLET2_R), FILLET2_R, 0, 90)
            Line((5 - FILLET2_R, 0), (5, 0))
            Line((5, 0), (5, -FILLET2_R))
        make_face()
    fillet2_piece_12 = revolve(axis=Axis((3, 3, -102), (0, -1, 0)), revolution_arc=94.169538965, mode=Mode.PRIVATE)
    fillet2_piece_12 = split(fillet2_piece_12, bisect_by=Plane(origin=(0, 3.470530119, -106.266382366), z_dir=(1, 0, 0)), keep=Keep.TOP, mode=Mode.PRIVATE)
    fillet2_piece_12 = split(fillet2_piece_12, bisect_by=Plane(origin=(1.642842463, 3.470530119, -105), z_dir=(0, 0, -1)), keep=Keep.TOP, mode=Mode.PRIVATE)
    add(fillet2_piece_12)
    with BuildSketch(Plane(origin=(140, 3, -102), x_dir=(-1, 0, 0), z_dir=(0, 0, 1))) as fillet2_piece_13:
        with BuildLine():
            CenterArc((FILLET2_R, -FILLET2_R), FILLET2_R, 90, 90)
            Line((0, -FILLET2_R), (0, 0))
            Line((0, 0), (FILLET2_R, 0))
        make_face()
    extrude(amount=65)
    with BuildSketch(Plane(origin=(140, 3, -43), x_dir=(-1, 0, 0), z_dir=(0, 0, 1))) as fillet2_piece_14:
        with BuildLine():
            CenterArc((FILLET2_R, -FILLET2_R), FILLET2_R, 90, 90)
            Line((0, -FILLET2_R), (0, 0))
            Line((0, 0), (FILLET2_R, 0))
        make_face()
    extrude(amount=40)
    with BuildSketch(Plane(origin=(135, 3, 2), x_dir=(0, 0, -1), z_dir=(-1, 0, 0))) as fillet2_piece_15:
        with BuildLine():
            CenterArc((FILLET2_R, -FILLET2_R), FILLET2_R, 90, 90)
            Line((0, -FILLET2_R), (0, 0))
            Line((0, 0), (FILLET2_R, 0))
        make_face()
    extrude(amount=132)
    with BuildSketch(Plane(origin=(-2, 3, -3), x_dir=(0, 1, 0), z_dir=(0, 0, -1))) as fillet2_piece_16:
        with BuildLine():
            CenterArc((FILLET2_R, FILLET2_R), FILLET2_R, 180, 90)
            Line((0, FILLET2_R), (0, 0))
            Line((0, 0), (FILLET2_R, 0))
        make_face()
    extrude(amount=40)
    with BuildSketch(Plane(origin=(-2, 3, -37), x_dir=(0, 1, 0), z_dir=(0, 0, -1))) as fillet2_piece_17:
        with BuildLine():
            CenterArc((FILLET2_R, FILLET2_R), FILLET2_R, 180, 90)
            Line((0, FILLET2_R), (0, 0))
            Line((0, 0), (FILLET2_R, 0))
        make_face()
    extrude(amount=65)


solid = part.part
